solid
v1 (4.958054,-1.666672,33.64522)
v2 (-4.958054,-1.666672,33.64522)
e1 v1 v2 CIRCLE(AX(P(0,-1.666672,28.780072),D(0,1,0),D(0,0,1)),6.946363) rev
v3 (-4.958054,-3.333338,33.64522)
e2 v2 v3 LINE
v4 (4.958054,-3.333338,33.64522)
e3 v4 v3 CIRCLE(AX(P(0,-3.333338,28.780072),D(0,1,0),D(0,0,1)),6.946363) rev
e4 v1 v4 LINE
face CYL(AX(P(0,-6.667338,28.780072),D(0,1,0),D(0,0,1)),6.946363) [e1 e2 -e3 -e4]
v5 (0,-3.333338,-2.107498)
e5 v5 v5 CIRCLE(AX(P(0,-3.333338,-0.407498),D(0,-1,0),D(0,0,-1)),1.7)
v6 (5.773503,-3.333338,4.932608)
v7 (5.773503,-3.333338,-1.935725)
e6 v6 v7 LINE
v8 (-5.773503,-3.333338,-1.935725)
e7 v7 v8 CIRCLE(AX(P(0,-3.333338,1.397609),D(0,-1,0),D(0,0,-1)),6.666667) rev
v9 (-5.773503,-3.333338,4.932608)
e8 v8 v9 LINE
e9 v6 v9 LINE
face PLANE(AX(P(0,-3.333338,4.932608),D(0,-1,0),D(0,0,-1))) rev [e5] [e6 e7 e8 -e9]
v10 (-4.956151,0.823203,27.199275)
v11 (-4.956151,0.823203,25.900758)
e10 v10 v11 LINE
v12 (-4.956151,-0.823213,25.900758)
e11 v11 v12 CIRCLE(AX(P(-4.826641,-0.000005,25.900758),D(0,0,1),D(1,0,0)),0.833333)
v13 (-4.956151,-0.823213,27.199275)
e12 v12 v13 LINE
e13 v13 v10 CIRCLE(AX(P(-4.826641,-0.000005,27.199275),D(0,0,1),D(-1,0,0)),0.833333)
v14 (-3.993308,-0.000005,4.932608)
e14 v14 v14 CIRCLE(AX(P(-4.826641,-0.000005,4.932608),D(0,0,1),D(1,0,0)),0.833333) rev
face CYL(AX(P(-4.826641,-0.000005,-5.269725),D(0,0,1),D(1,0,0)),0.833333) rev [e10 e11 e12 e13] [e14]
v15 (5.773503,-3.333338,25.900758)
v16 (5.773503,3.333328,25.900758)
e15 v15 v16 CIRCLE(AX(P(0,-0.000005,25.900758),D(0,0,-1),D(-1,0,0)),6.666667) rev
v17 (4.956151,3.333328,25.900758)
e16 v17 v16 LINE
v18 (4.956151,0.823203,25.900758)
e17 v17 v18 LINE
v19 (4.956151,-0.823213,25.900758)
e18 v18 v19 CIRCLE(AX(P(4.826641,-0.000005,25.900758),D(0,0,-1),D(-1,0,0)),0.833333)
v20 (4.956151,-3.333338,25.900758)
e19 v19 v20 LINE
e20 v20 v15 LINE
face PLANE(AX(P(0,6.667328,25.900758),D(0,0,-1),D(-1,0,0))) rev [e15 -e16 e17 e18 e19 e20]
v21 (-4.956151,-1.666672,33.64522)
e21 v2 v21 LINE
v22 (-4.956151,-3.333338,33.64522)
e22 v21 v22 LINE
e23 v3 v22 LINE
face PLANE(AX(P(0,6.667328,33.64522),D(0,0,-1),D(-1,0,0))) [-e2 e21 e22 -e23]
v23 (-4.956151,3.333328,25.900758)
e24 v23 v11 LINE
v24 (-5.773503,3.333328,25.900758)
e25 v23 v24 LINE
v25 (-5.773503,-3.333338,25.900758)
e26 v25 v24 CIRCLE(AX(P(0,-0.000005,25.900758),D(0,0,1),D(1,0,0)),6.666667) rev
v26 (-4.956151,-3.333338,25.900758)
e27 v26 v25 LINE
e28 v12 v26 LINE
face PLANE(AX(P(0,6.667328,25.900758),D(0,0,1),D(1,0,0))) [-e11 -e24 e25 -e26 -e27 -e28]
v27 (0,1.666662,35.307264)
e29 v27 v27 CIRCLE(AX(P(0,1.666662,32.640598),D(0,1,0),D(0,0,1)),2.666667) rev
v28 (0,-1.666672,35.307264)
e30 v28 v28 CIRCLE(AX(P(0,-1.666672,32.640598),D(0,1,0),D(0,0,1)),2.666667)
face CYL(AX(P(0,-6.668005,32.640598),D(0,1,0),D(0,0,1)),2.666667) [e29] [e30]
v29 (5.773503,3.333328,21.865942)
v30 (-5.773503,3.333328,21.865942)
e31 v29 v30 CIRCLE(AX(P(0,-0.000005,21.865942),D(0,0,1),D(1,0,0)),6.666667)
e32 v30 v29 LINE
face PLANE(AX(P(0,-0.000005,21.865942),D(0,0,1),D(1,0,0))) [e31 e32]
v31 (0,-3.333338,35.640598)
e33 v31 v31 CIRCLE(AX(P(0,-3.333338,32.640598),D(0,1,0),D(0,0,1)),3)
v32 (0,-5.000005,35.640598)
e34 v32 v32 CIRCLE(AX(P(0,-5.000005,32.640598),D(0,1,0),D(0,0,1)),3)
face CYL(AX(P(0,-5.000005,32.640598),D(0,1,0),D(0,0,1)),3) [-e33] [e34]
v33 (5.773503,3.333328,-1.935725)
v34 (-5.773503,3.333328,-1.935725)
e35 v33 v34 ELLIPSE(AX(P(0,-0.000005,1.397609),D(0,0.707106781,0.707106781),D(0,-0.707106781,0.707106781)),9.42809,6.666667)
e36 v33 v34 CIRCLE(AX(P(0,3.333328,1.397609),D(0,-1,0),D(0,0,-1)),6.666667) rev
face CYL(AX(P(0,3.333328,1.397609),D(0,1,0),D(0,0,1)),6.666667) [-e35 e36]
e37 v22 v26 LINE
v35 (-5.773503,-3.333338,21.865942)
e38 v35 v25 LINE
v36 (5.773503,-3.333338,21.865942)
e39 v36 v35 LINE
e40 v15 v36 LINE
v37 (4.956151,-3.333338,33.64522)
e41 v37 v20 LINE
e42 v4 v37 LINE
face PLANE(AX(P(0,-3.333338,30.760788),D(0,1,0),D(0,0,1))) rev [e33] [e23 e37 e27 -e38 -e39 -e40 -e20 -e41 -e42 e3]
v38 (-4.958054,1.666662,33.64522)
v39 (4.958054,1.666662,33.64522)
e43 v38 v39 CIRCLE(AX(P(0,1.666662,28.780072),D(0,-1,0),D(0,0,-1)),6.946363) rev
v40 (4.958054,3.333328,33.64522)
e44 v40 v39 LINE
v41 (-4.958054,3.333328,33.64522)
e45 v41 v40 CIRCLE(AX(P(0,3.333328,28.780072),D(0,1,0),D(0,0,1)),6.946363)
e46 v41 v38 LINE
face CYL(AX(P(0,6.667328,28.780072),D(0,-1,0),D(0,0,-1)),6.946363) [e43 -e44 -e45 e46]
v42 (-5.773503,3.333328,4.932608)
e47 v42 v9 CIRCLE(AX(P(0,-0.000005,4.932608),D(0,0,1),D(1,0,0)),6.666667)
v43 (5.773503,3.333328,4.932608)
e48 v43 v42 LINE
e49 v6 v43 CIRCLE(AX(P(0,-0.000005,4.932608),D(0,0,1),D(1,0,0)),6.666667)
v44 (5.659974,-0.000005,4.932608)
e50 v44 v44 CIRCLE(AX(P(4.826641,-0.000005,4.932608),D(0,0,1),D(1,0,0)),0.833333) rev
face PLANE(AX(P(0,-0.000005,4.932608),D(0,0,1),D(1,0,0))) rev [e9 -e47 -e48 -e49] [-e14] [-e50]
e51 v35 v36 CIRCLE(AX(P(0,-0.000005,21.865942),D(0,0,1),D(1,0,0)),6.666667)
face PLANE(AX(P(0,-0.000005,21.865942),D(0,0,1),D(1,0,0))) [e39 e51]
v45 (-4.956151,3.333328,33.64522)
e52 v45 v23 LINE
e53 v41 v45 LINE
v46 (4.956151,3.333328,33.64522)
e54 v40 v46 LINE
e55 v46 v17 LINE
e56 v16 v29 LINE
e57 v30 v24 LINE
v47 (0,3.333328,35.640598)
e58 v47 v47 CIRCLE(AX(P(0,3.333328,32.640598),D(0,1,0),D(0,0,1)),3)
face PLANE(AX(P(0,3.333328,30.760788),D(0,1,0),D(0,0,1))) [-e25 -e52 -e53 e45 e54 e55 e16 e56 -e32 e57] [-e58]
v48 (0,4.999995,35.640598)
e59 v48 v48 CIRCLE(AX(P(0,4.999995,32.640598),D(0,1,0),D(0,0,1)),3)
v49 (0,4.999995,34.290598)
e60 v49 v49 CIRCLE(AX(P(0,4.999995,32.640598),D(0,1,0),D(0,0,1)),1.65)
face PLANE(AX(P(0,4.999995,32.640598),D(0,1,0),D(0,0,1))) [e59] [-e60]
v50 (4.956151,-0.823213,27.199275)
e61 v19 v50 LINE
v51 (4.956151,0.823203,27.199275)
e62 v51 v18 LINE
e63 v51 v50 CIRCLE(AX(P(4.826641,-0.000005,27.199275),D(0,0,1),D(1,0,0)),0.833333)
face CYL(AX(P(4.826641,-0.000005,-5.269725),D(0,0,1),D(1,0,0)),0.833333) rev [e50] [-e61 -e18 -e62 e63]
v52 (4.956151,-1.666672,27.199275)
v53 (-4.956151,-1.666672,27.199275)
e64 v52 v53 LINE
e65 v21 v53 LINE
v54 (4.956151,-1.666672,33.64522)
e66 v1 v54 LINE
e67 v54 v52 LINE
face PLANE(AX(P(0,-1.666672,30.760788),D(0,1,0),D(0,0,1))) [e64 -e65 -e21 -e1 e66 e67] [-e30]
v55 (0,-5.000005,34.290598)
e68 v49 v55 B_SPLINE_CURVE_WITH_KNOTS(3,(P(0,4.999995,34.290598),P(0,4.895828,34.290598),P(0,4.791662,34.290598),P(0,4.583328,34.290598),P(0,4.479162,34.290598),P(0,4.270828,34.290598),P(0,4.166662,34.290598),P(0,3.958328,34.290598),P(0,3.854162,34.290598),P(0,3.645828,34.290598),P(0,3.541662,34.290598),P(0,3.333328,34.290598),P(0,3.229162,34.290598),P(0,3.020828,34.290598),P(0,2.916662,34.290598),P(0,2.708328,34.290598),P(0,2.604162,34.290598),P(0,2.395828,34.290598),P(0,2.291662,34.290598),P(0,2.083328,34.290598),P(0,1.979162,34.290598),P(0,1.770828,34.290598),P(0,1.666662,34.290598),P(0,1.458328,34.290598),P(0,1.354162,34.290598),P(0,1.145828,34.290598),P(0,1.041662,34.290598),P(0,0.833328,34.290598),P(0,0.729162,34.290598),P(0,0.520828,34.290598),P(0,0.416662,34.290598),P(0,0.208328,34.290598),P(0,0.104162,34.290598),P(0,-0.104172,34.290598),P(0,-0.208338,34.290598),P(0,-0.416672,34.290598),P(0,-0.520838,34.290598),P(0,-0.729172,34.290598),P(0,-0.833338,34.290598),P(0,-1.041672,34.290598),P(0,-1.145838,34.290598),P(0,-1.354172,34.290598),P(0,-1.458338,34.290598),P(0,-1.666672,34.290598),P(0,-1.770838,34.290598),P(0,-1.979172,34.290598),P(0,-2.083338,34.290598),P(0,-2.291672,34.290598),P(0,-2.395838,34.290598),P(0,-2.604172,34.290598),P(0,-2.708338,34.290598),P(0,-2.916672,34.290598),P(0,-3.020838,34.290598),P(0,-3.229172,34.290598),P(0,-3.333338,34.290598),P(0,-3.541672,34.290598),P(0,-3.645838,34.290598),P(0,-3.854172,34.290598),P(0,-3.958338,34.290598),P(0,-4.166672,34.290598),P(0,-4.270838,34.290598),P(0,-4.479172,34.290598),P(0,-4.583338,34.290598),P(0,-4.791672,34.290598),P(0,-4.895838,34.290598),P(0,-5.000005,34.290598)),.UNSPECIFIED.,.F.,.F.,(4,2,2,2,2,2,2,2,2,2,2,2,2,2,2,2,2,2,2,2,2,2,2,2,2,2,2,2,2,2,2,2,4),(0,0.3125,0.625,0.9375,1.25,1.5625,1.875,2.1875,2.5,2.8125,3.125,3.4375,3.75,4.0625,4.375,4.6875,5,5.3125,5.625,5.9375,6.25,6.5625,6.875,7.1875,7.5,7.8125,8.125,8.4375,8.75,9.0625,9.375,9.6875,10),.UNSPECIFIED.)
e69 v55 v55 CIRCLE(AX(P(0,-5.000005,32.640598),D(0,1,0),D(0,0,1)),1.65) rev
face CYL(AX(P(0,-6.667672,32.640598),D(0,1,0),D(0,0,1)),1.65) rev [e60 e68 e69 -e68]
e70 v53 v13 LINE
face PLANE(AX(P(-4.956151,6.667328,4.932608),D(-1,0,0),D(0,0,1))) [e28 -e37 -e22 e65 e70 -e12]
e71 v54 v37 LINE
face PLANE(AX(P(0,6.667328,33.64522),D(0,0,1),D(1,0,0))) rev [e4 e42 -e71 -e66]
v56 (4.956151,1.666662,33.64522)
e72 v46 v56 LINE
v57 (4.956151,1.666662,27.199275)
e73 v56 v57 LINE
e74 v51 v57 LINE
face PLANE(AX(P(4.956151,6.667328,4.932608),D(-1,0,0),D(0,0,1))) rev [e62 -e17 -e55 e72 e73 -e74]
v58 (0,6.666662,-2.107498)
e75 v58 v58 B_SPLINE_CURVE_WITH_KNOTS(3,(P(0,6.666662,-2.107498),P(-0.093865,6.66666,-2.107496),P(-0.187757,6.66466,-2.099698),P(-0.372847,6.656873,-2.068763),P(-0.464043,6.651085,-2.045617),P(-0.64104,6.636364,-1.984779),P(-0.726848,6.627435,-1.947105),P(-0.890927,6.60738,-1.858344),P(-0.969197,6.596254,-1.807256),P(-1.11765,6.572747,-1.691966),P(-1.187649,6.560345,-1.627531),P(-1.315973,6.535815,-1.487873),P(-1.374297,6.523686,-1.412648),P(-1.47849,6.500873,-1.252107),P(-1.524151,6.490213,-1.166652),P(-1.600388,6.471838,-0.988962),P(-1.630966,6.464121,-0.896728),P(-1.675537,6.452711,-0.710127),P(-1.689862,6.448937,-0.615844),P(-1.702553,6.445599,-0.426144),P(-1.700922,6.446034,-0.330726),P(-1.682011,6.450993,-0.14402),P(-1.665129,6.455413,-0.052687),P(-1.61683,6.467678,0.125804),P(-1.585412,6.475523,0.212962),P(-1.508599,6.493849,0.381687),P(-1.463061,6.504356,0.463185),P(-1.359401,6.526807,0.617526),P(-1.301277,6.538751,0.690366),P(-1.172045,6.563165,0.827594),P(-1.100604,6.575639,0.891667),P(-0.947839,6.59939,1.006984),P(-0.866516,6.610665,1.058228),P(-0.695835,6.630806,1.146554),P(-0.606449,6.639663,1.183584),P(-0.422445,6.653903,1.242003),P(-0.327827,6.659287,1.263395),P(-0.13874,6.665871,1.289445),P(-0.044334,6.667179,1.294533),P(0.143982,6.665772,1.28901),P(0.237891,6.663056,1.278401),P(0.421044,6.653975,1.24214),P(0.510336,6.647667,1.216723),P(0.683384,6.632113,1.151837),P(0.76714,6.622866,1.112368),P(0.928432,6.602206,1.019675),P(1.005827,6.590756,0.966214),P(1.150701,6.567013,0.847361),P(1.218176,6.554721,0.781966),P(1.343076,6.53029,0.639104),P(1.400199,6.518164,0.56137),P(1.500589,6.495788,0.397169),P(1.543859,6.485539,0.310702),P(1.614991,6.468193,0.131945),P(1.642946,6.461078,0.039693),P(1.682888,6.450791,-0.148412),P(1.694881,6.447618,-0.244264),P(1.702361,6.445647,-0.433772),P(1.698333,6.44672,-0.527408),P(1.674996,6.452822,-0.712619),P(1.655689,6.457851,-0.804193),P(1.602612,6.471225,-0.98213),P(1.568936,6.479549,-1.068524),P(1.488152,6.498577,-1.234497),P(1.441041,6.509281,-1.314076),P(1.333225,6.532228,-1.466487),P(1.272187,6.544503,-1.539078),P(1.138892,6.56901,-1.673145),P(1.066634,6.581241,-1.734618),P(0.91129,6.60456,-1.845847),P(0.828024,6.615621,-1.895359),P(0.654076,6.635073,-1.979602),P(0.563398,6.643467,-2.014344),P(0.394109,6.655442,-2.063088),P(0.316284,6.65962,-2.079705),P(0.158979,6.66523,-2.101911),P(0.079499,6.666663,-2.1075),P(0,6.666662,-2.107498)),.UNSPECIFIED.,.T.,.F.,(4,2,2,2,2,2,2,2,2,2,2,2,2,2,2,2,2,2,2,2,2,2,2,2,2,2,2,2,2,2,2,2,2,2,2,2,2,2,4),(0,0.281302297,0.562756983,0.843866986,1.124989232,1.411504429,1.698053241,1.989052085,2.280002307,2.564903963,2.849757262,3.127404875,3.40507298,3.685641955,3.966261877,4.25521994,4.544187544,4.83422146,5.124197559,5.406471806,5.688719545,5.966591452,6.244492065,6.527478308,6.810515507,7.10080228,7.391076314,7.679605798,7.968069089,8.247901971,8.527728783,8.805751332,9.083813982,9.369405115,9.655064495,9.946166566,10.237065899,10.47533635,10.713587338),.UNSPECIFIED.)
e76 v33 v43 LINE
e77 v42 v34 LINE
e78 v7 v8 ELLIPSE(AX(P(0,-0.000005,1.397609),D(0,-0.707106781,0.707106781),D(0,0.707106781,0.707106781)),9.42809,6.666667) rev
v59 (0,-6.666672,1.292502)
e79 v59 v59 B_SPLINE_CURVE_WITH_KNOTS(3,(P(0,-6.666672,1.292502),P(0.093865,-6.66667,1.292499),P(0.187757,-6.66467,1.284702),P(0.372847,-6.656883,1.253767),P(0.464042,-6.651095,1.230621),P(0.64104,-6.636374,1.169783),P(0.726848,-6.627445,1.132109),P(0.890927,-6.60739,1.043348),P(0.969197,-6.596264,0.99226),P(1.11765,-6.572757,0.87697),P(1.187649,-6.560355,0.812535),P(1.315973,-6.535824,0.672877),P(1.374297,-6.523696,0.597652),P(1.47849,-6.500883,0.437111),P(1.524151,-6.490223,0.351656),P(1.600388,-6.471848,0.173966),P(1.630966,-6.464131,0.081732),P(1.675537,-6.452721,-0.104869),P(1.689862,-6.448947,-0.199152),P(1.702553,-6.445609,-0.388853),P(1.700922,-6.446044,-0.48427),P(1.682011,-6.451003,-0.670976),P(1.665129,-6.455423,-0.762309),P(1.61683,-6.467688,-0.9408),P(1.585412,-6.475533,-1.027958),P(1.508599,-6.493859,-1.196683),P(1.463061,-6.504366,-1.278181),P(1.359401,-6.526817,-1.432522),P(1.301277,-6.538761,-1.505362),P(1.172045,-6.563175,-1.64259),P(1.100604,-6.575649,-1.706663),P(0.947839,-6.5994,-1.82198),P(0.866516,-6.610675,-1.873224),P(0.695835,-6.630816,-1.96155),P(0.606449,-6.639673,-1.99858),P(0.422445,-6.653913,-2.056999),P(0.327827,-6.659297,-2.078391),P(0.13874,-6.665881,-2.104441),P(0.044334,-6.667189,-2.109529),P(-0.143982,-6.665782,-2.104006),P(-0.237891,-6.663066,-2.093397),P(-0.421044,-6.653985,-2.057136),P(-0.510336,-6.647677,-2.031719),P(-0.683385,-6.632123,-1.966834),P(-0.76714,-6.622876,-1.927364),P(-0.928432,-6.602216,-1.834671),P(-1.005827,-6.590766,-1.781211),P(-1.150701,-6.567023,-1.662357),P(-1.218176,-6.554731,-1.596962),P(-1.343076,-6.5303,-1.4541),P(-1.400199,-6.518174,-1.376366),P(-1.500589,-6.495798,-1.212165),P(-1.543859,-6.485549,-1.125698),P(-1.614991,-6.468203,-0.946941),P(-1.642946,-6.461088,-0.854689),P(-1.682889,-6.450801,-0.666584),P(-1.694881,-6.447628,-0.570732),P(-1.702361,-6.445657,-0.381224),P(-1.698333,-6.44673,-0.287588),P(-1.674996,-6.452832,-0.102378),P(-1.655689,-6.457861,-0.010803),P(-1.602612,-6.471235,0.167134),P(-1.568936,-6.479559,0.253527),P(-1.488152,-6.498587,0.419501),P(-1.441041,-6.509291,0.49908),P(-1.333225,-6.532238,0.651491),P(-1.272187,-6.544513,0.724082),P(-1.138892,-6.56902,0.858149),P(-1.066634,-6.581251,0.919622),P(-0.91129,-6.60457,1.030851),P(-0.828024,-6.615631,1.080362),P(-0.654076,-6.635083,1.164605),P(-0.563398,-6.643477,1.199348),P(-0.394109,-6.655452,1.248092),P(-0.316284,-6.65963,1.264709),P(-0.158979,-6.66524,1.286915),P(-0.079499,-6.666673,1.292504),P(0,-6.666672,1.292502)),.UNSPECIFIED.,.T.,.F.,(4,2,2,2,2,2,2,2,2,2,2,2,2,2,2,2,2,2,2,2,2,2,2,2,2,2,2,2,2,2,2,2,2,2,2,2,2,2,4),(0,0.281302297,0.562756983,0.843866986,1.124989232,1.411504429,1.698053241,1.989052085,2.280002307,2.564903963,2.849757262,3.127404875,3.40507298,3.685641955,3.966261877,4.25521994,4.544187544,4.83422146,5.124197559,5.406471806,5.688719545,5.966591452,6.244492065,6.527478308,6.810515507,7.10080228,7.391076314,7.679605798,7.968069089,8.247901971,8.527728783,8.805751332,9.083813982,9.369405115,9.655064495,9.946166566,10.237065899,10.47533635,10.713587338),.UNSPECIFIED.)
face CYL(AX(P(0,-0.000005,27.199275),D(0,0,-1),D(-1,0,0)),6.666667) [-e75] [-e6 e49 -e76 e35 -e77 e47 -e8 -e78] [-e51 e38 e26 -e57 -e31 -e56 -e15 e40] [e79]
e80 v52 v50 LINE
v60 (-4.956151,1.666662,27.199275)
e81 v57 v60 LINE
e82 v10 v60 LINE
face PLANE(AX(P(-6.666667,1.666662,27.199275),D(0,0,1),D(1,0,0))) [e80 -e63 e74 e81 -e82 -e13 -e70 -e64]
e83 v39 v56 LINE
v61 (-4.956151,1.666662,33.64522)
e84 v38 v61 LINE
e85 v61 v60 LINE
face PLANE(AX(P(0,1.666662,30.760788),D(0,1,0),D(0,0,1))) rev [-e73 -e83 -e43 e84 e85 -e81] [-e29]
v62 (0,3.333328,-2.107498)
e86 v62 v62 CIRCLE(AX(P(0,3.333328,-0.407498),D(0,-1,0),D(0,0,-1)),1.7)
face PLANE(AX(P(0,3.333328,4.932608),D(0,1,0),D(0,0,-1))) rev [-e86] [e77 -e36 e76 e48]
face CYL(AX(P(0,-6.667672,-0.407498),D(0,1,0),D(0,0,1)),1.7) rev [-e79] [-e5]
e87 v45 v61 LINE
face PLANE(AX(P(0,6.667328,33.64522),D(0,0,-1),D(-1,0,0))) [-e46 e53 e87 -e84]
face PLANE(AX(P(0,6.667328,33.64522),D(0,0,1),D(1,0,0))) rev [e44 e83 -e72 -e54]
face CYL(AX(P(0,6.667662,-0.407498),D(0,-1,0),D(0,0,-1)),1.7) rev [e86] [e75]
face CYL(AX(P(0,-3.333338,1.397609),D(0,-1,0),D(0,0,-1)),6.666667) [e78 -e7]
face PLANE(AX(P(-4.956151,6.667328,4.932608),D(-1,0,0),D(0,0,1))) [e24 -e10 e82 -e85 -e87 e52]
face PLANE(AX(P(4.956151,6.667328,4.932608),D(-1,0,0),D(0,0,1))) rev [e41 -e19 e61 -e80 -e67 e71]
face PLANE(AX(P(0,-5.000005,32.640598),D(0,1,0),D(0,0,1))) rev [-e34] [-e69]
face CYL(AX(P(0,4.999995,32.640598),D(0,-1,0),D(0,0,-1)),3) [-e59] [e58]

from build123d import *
from build123d.topology import SkipClean

# Parameters (mm, degrees)
SKETCH2_R                       = 10
PHALANGE_LENGTH_DEPTH           = 33.4
BOSS_EXTRUDE3_DEPTH             = 5
BOSS_EXTRUDE4_DEPTH             = 5
BOSS_EXTRUDE4_DEPTH_BACK        = 5
CUT_EXTRUDE2_START              = -15.3025
CUT_EXTRUDE2_DEPTH              = 15.3025
SKETCH7_R                       = 1.65
CUT_EXTRUDE3_DEPTH              = 10
CUT_EXTRUDE4_DEPTH              = 2.5
CUT_EXTRUDE4_DEPTH_BACK         = 2.5
CUT_EXTRUDE7_REACH              = 53.978
SKETCH4_R                       = 1.65
CUT_EXTRUDE7_DIRECTION_2_REACH  = 53.978
CUT_EXTRUDE_THIN1_START         = 33.4
CUT_EXTRUDE_THIN1_DEPTH         = 10.361670454
BOSS_EXTRUDE5_REACH             = 53.313
SKETCH9_R                       = 4
SKETCH9_R_2                     = 1.65
CUT_EXTRUDE8_REACH              = 52.714
SKETCH10_R                      = 1.25
CUT_EXTRUDE9_START              = -8
CUT_EXTRUDE9_DEPTH              = 8
CUT_EXTRUDE10_REACH             = 53.313
CUT_EXTRUDE10_DIRECTION_2_REACH = 53.313
CUT_EXTRUDE11_START             = -10
CUT_EXTRUDE11_OUTLINE_W         = 2.565773848
CUT_EXTRUDE11_OUTLINE_H         = 11.6166929
CUT_EXTRUDE11_DEPTH             = 10
BOSS_EXTRUDE6_START             = 7.5
SKETCH14_R                      = 4.5
SKETCH14_R_2                    = 1.65
BOSS_EXTRUDE6_DEPTH             = 2.5
BOSS_EXTRUDE7_START             = -7.5
SKETCH14_2_R                    = 4.5
SKETCH14_2_R_2                  = 1.65
BOSS_EXTRUDE7_DEPTH             = 2.5
SCALE1_SCALE                    = 0.666666667
CUT_EXTRUDE12_START             = -11.666667
SKETCH15_R                      = 1.65
CUT_EXTRUDE12_DEPTH             = 13.333339
CUT_EXTRUDE13_REACH             = 39.694
SKETCH16_R                      = 1.7
CUT_EXTRUDE13_DIRECTION_2_REACH = 39.694


# Read off the part's stored shape, not the designer's step: Cut-Extrude-Thin1, Cut-Extrude11
with BuildPart() as part:
    # Sketch2 → Phalange Length (new body)
    with BuildSketch(Plane.XY):
        Circle(SKETCH2_R)
    extrude(amount=PHALANGE_LENGTH_DEPTH)

    # Sketch3 → Boss-Extrude3 (add)
    with BuildSketch(Plane(origin=(0, -10, 0), x_dir=(-1, 0, 0), z_dir=(0, -1, 0))):
        with BuildLine():
            Line((-10, 5.302499701), (-10, 0))
            Line((-10, 0), (10, 0))
            Line((10, 0), (10, 5.302499701))
            ThreePointArc((10, 5.302499701), (0, 15.302499701), (-10, 5.302499701))
        make_face()
    boss_extrude3 = extrude(amount=-BOSS_EXTRUDE3_DEPTH)

    # Mirror1: Boss-Extrude3 across plane
    add(boss_extrude3.mirror(Plane.ZX))

    # Sketch5 → Boss-Extrude4 (add, two sides: drawn at the far end of the back side and taken through both)
    with BuildSketch(Plane(origin=(0, 0, 0), x_dir=(1, 0, 0), z_dir=(0, 1, 0)).offset(-BOSS_EXTRUDE4_DEPTH_BACK)):
        with BuildLine():
            Line((-10, -39.183157911), (-10, -33.4))
            Line((-10, -33.4), (10, -33.4))
            Line((10, -33.4), (10, -39.183157911))
            ThreePointArc((10, -39.183157911), (0, -48.751984156), (-10, -39.183157911))
        make_face()
    extrude(amount=BOSS_EXTRUDE4_DEPTH + BOSS_EXTRUDE4_DEPTH_BACK)

    # Sketch6 → Cut-Extrude2 (cut)
    with SkipClean():  # the faces are left unmerged after this step: merging them gives an invalid solid
        with BuildSketch(Plane.XY.offset(CUT_EXTRUDE2_START)):
            with BuildLine():
                ThreePointArc((0, 10), (5, 8.660254038), (8.660254038, 5))
                Line((8.660254038, 5), (10, 5))
                Line((10, 5), (10, 10))
                Line((10, 10), (0, 10))
            make_face()
            with BuildLine():
                Line((10, -5), (8.660254038, -5))
                ThreePointArc((8.660254038, -5), (5, -8.660254038), (0, -10))
                Line((0, -10), (10, -10))
                Line((10, -10), (10, -5))
            make_face()
            with BuildLine():
                ThreePointArc((-8.660254038, 5), (-5, 8.660254038), (0, 10))
                Line((0, 10), (-10, 10))
                Line((-10, 10), (-10, 5))
                Line((-10, 5), (-8.660254038, 5))
            make_face()
            with BuildLine():
                Line((-10, -10), (0, -10))
                ThreePointArc((0, -10), (-5, -8.660254038), (-8.660254038, -5))
                Line((-8.660254038, -5), (-10, -5))
                Line((-10, -5), (-10, -10))
            make_face()
        extrude(amount=CUT_EXTRUDE2_DEPTH, mode=Mode.SUBTRACT)

    # Sketch7 → Cut-Extrude3 (cut)
    with SkipClean():  # the faces are left unmerged after this step: merging them gives an invalid solid
        with BuildSketch(Plane(origin=(0, 5, 0), x_dir=(1, 0, 0), z_dir=(0, 1, 0))):
            with Locations(Location((0, -41.561984156, 0), (0, 0, 270))):
                Circle(SKETCH7_R)
        extrude(amount=-CUT_EXTRUDE3_DEPTH, mode=Mode.SUBTRACT)

    # Sketch5<2> → Cut-Extrude4 (cut, two sides: drawn at the far end of the back side and taken through both)
    with BuildSketch(Plane(origin=(0, 0, 0), x_dir=(1, 0, 0), z_dir=(0, 1, 0)).offset(-CUT_EXTRUDE4_DEPTH_BACK)):
        with BuildLine():
            Line((-10, -39.183157911), (-10, -33.4))
            Line((-10, -33.4), (10, -33.4))
            Line((10, -33.4), (10, -39.183157911))
            ThreePointArc((10, -39.183157911), (0, -48.751984156), (-10, -39.183157911))
        make_face()
    extrude(amount=CUT_EXTRUDE4_DEPTH + CUT_EXTRUDE4_DEPTH_BACK, mode=Mode.SUBTRACT)

    # Sketch4 → Cut-Extrude7 (cut, up to next)
    with BuildSketch(Plane(origin=(0, -5, 0), x_dir=(1, 0, 0), z_dir=(0, 1, 0)), mode=Mode.PRIVATE) as cut_extrude7_sk1:
        with Locations(Location((0, 8.010159673, 0), (0, 0, 270))):
            Circle(SKETCH4_R)
    cut_extrude7_tool1 = extrude(cut_extrude7_sk1.sketch, amount=-CUT_EXTRUDE7_REACH, mode=Mode.PRIVATE) & part.part
    add(cut_extrude7_tool1.solids().sort_by_distance((0, -5, -8.01016))[0], mode=Mode.SUBTRACT)

    # Sketch4 → Cut-Extrude7 direction 2 (cut, up to next)
    with BuildSketch(Plane(origin=(0, -5, 0), x_dir=(1, 0, 0), z_dir=(0, 1, 0)), mode=Mode.PRIVATE) as cut_extrude7_direction_2_sk1:
        with Locations(Location((0, 8.010159673, 0), (0, 0, 270))):
            Circle(SKETCH4_R)
    cut_extrude7_direction_2_tool1 = extrude(cut_extrude7_direction_2_sk1.sketch, amount=CUT_EXTRUDE7_DIRECTION_2_REACH, mode=Mode.PRIVATE) & part.part
    add(cut_extrude7_direction_2_tool1.solids().sort_by_distance((0, -5, -8.01016))[0], mode=Mode.SUBTRACT)

    # Cut-Extrude-Thin1 outline → Cut-Extrude-Thin1 (cut)
    with SkipClean():  # the faces are left unmerged after this step: merging them gives an invalid solid
        with BuildSketch(Plane.XY.offset(CUT_EXTRUDE_THIN1_START)):
            with BuildLine():
                ThreePointArc((8.660254038, 5), (9.256147934, 3.78466979), (9.682458366, 2.5))
                Line((9.682458366, 2.5), (10, 2.5))
                Line((10, 2.5), (10, 5))
                Line((10, 5), (8.660254038, 5))
            make_face()
            with BuildLine():
                Line((10, -2.5), (9.682458366, -2.5))
                ThreePointArc((9.682458366, -2.5), (9.256147934, -3.78466979), (8.660254038, -5))
                Line((8.660254038, -5), (10, -5))
                Line((10, -5), (10, -2.5))
            make_face()
            with BuildLine():
                Line((-10, 2.5), (-9.682458366, 2.5))
                ThreePointArc((-9.682458366, 2.5), (-9.256147934, 3.78466979), (-8.660254038, 5))
                Line((-8.660254038, 5), (-10, 5))
                Line((-10, 5), (-10, 2.5))
            make_face()
            with BuildLine():
                ThreePointArc((-8.660254038, -5), (-9.256147934, -3.78466979), (-9.682458366, -2.5))
                Line((-9.682458366, -2.5), (-10, -2.5))
                Line((-10, -2.5), (-10, -5))
                Line((-10, -5), (-8.660254038, -5))
            make_face()
        extrude(amount=CUT_EXTRUDE_THIN1_DEPTH, mode=Mode.SUBTRACT)

    # Sketch9 → Boss-Extrude5 (add, up to next)
    with BuildSketch(Plane.XZ.offset(-2.5), mode=Mode.PRIVATE) as boss_extrude5_sk1:
        with Locations(Location((0, 41.561984156, 0), (0, 0, 90))):
            Circle(SKETCH9_R)
        with Locations(Location((0, 41.561984156, 0), (0, 0, 90))):
            Circle(SKETCH9_R_2, mode=Mode.SUBTRACT)
    boss_extrude5_tool1 = extrude(boss_extrude5_sk1.sketch, amount=BOSS_EXTRUDE5_REACH, mode=Mode.PRIVATE) - part.part
    add(boss_extrude5_tool1.solids().sort_by_distance((0, 2.5, 37.675121))[0])

    # Sketch10 → Cut-Extrude8 (cut, up to next)
    with BuildSketch(Plane.XY.offset(33.4), mode=Mode.PRIVATE) as cut_extrude8_sk1:
        with Locations((7.239961745, 0)):
            Circle(SKETCH10_R)
    cut_extrude8_tool1 = extrude(cut_extrude8_sk1.sketch, amount=-CUT_EXTRUDE8_REACH, mode=Mode.PRIVATE) & part.part
    # Sketch10 → Cut-Extrude8 (cut, up to next)
    with BuildSketch(Plane.XY.offset(33.4), mode=Mode.PRIVATE) as cut_extrude8_sk2:
        with Locations((-7.239961745, 0)):
            Circle(SKETCH10_R)
    cut_extrude8_tool2 = extrude(cut_extrude8_sk2.sketch, amount=-CUT_EXTRUDE8_REACH, mode=Mode.PRIVATE) & part.part
    add(cut_extrude8_tool1.solids().sort_by_distance((7.239962, 0, 33.4))[0], mode=Mode.SUBTRACT)
    add(cut_extrude8_tool2.solids().sort_by_distance((-7.239962, 0, 33.4))[0], mode=Mode.SUBTRACT)

    # Sketch11 → Cut-Extrude9 (cut)
    with SkipClean():  # the faces are left unmerged after this step: merging them gives an invalid solid
        with BuildSketch(Plane.XY.offset(33.4).offset(CUT_EXTRUDE9_START)):
            with BuildLine():
                ThreePointArc((8.660254038, 5), (0, 10), (-8.660254038, 5))
                Line((-8.660254038, 5), (8.660254038, 5))
            make_face()
            with BuildLine():
                Line((8.660254038, -5), (-8.660254038, -5))
                ThreePointArc((-8.660254038, -5), (0, -10), (8.660254038, -5))
            make_face()
        extrude(amount=CUT_EXTRUDE9_DEPTH, mode=Mode.SUBTRACT)

    # Sketch12 → Cut-Extrude10 (cut, up to next)
    with BuildSketch(Plane.XZ.offset(-2.5), mode=Mode.PRIVATE) as cut_extrude10_sk1:
        with BuildLine():
            Line((-10.033719202, 48.751984156), (-10.033719202, 41.564892021))
            Line((-10.033719202, 41.564892021), (-8.660254038, 41.564892021))
            ThreePointArc((-8.660254038, 41.564892021), (0, 46.190740593), (8.660254038, 41.564892021))
            Line((8.660254038, 41.564892021), (10.033719202, 41.564892021))
            Line((10.033719202, 41.564892021), (10.033719202, 48.751984156))
            Line((10.033719202, 48.751984156), (-10.033719202, 48.751984156))
        make_face()
    cut_extrude10_tool1 = extrude(cut_extrude10_sk1.sketch, amount=CUT_EXTRUDE10_REACH, mode=Mode.PRIVATE) & part.part
    add(cut_extrude10_tool1.solids().sort_by_distance((0, 2.5, 46.250279))[0], mode=Mode.SUBTRACT)

    # Sketch12 → Cut-Extrude10 direction 2 (cut, up to next)
    with BuildSketch(Plane.XZ.offset(-2.5), mode=Mode.PRIVATE) as cut_extrude10_direction_2_sk1:
        with BuildLine():
            Line((-10.033719202, 48.751984156), (-10.033719202, 41.564892021))
            Line((-10.033719202, 41.564892021), (-8.660254038, 41.564892021))
            ThreePointArc((-8.660254038, 41.564892021), (0, 46.190740593), (8.660254038, 41.564892021))
            Line((8.660254038, 41.564892021), (10.033719202, 41.564892021))
            Line((10.033719202, 41.564892021), (10.033719202, 48.751984156))
            Line((10.033719202, 48.751984156), (-10.033719202, 48.751984156))
        make_face()
    cut_extrude10_direction_2_tool1 = extrude(cut_extrude10_direction_2_sk1.sketch, amount=-CUT_EXTRUDE10_DIRECTION_2_REACH, mode=Mode.PRIVATE) & part.part
    add(cut_extrude10_direction_2_tool1.solids().sort_by_distance((0, 2.5, 46.250279))[0], mode=Mode.SUBTRACT)

    # Cut-Extrude11 outline → Cut-Extrude11 (cut)
    with BuildSketch(Plane.XZ.offset(5).offset(CUT_EXTRUDE11_START)):
        with Locations((-8.717113076, 37.260571369)):
            Rectangle(CUT_EXTRUDE11_OUTLINE_W, CUT_EXTRUDE11_OUTLINE_H)
        with Locations((8.717113076, 37.260571369)):
            Rectangle(CUT_EXTRUDE11_OUTLINE_W, CUT_EXTRUDE11_OUTLINE_H)
    extrude(amount=CUT_EXTRUDE11_DEPTH, mode=Mode.SUBTRACT)

    # Sketch14 → Boss-Extrude6 (add)
    with SkipClean():  # the faces are left unmerged after this step: merging them gives an invalid solid
        with BuildSketch(Plane(origin=(0, 0, 0), x_dir=(1, 0, 0), z_dir=(0, 1, 0)).offset(BOSS_EXTRUDE6_START)):
            with Locations(Location((0, -41.561984156, 0), (0, 0, 270))):
                Circle(SKETCH14_R)
            with Locations(Location((0, -41.561984156, 0), (0, 0, 270))):
                Circle(SKETCH14_R_2, mode=Mode.SUBTRACT)
        extrude(amount=-BOSS_EXTRUDE6_DEPTH)

    # Sketch14<2> → Boss-Extrude7 (add)
    with SkipClean():  # the faces are left unmerged after this step: merging them gives an invalid solid
        with BuildSketch(Plane(origin=(0, 0, 0), x_dir=(1, 0, 0), z_dir=(0, 1, 0)).offset(BOSS_EXTRUDE7_START)):
            with Locations(Location((0, -41.561984156, 0), (0, 0, 270))):
                Circle(SKETCH14_2_R)
            with Locations(Location((0, -41.561984156, 0), (0, 0, 270))):
                Circle(SKETCH14_2_R_2, mode=Mode.SUBTRACT)
        extrude(amount=BOSS_EXTRUDE7_DEPTH)


with BuildPart() as part_1:
    # Scale1: scaled about (1e-09, 6.5e-08, 14.797343539)
    add(part.part.scale(SCALE1_SCALE).moved(Location((0, 2.2e-08, 4.932447846))))

    # Sketch15 → Cut-Extrude12 (cut)
    with BuildSketch(Plane(origin=(0, 4.999995016, 0), x_dir=(1, 0, 0), z_dir=(0, 1, 0)).offset(CUT_EXTRUDE12_START)):
        with Locations(Location((-8e-09, -32.640597832, 0), (0, 0, 270))):
            Circle(SKETCH15_R)
    extrude(amount=CUT_EXTRUDE12_DEPTH, mode=Mode.SUBTRACT)

    # Sketch16 → Cut-Extrude13 (cut, up to next)
    with BuildSketch(Plane.XZ.offset(-3.33332835), mode=Mode.PRIVATE) as cut_extrude13_sk1:
        with Locations(Location((-8e-09, -0.407498054, 0), (0, 0, 270))):
            Circle(SKETCH16_R)
    cut_extrude13_tool1 = extrude(cut_extrude13_sk1.sketch, amount=-CUT_EXTRUDE13_REACH, mode=Mode.PRIVATE) & part_1.part
    add(cut_extrude13_tool1.solids().sort_by_distance((0, 3.333328, -0.407498))[0], mode=Mode.SUBTRACT)

    # Sketch16 → Cut-Extrude13 direction 2 (cut, up to next)
    with BuildSketch(Plane.XZ.offset(-3.33332835), mode=Mode.PRIVATE) as cut_extrude13_direction_2_sk1:
        with Locations(Location((-8e-09, -0.407498054, 0), (0, 0, 270))):
            Circle(SKETCH16_R)
    cut_extrude13_direction_2_tool1 = extrude(cut_extrude13_direction_2_sk1.sketch, amount=CUT_EXTRUDE13_DIRECTION_2_REACH, mode=Mode.PRIVATE) & part_1.part
    add(cut_extrude13_direction_2_tool1.solids().sort_by_distance((0, 3.333328, -0.407498))[0], mode=Mode.SUBTRACT)


solid = part_1.part
